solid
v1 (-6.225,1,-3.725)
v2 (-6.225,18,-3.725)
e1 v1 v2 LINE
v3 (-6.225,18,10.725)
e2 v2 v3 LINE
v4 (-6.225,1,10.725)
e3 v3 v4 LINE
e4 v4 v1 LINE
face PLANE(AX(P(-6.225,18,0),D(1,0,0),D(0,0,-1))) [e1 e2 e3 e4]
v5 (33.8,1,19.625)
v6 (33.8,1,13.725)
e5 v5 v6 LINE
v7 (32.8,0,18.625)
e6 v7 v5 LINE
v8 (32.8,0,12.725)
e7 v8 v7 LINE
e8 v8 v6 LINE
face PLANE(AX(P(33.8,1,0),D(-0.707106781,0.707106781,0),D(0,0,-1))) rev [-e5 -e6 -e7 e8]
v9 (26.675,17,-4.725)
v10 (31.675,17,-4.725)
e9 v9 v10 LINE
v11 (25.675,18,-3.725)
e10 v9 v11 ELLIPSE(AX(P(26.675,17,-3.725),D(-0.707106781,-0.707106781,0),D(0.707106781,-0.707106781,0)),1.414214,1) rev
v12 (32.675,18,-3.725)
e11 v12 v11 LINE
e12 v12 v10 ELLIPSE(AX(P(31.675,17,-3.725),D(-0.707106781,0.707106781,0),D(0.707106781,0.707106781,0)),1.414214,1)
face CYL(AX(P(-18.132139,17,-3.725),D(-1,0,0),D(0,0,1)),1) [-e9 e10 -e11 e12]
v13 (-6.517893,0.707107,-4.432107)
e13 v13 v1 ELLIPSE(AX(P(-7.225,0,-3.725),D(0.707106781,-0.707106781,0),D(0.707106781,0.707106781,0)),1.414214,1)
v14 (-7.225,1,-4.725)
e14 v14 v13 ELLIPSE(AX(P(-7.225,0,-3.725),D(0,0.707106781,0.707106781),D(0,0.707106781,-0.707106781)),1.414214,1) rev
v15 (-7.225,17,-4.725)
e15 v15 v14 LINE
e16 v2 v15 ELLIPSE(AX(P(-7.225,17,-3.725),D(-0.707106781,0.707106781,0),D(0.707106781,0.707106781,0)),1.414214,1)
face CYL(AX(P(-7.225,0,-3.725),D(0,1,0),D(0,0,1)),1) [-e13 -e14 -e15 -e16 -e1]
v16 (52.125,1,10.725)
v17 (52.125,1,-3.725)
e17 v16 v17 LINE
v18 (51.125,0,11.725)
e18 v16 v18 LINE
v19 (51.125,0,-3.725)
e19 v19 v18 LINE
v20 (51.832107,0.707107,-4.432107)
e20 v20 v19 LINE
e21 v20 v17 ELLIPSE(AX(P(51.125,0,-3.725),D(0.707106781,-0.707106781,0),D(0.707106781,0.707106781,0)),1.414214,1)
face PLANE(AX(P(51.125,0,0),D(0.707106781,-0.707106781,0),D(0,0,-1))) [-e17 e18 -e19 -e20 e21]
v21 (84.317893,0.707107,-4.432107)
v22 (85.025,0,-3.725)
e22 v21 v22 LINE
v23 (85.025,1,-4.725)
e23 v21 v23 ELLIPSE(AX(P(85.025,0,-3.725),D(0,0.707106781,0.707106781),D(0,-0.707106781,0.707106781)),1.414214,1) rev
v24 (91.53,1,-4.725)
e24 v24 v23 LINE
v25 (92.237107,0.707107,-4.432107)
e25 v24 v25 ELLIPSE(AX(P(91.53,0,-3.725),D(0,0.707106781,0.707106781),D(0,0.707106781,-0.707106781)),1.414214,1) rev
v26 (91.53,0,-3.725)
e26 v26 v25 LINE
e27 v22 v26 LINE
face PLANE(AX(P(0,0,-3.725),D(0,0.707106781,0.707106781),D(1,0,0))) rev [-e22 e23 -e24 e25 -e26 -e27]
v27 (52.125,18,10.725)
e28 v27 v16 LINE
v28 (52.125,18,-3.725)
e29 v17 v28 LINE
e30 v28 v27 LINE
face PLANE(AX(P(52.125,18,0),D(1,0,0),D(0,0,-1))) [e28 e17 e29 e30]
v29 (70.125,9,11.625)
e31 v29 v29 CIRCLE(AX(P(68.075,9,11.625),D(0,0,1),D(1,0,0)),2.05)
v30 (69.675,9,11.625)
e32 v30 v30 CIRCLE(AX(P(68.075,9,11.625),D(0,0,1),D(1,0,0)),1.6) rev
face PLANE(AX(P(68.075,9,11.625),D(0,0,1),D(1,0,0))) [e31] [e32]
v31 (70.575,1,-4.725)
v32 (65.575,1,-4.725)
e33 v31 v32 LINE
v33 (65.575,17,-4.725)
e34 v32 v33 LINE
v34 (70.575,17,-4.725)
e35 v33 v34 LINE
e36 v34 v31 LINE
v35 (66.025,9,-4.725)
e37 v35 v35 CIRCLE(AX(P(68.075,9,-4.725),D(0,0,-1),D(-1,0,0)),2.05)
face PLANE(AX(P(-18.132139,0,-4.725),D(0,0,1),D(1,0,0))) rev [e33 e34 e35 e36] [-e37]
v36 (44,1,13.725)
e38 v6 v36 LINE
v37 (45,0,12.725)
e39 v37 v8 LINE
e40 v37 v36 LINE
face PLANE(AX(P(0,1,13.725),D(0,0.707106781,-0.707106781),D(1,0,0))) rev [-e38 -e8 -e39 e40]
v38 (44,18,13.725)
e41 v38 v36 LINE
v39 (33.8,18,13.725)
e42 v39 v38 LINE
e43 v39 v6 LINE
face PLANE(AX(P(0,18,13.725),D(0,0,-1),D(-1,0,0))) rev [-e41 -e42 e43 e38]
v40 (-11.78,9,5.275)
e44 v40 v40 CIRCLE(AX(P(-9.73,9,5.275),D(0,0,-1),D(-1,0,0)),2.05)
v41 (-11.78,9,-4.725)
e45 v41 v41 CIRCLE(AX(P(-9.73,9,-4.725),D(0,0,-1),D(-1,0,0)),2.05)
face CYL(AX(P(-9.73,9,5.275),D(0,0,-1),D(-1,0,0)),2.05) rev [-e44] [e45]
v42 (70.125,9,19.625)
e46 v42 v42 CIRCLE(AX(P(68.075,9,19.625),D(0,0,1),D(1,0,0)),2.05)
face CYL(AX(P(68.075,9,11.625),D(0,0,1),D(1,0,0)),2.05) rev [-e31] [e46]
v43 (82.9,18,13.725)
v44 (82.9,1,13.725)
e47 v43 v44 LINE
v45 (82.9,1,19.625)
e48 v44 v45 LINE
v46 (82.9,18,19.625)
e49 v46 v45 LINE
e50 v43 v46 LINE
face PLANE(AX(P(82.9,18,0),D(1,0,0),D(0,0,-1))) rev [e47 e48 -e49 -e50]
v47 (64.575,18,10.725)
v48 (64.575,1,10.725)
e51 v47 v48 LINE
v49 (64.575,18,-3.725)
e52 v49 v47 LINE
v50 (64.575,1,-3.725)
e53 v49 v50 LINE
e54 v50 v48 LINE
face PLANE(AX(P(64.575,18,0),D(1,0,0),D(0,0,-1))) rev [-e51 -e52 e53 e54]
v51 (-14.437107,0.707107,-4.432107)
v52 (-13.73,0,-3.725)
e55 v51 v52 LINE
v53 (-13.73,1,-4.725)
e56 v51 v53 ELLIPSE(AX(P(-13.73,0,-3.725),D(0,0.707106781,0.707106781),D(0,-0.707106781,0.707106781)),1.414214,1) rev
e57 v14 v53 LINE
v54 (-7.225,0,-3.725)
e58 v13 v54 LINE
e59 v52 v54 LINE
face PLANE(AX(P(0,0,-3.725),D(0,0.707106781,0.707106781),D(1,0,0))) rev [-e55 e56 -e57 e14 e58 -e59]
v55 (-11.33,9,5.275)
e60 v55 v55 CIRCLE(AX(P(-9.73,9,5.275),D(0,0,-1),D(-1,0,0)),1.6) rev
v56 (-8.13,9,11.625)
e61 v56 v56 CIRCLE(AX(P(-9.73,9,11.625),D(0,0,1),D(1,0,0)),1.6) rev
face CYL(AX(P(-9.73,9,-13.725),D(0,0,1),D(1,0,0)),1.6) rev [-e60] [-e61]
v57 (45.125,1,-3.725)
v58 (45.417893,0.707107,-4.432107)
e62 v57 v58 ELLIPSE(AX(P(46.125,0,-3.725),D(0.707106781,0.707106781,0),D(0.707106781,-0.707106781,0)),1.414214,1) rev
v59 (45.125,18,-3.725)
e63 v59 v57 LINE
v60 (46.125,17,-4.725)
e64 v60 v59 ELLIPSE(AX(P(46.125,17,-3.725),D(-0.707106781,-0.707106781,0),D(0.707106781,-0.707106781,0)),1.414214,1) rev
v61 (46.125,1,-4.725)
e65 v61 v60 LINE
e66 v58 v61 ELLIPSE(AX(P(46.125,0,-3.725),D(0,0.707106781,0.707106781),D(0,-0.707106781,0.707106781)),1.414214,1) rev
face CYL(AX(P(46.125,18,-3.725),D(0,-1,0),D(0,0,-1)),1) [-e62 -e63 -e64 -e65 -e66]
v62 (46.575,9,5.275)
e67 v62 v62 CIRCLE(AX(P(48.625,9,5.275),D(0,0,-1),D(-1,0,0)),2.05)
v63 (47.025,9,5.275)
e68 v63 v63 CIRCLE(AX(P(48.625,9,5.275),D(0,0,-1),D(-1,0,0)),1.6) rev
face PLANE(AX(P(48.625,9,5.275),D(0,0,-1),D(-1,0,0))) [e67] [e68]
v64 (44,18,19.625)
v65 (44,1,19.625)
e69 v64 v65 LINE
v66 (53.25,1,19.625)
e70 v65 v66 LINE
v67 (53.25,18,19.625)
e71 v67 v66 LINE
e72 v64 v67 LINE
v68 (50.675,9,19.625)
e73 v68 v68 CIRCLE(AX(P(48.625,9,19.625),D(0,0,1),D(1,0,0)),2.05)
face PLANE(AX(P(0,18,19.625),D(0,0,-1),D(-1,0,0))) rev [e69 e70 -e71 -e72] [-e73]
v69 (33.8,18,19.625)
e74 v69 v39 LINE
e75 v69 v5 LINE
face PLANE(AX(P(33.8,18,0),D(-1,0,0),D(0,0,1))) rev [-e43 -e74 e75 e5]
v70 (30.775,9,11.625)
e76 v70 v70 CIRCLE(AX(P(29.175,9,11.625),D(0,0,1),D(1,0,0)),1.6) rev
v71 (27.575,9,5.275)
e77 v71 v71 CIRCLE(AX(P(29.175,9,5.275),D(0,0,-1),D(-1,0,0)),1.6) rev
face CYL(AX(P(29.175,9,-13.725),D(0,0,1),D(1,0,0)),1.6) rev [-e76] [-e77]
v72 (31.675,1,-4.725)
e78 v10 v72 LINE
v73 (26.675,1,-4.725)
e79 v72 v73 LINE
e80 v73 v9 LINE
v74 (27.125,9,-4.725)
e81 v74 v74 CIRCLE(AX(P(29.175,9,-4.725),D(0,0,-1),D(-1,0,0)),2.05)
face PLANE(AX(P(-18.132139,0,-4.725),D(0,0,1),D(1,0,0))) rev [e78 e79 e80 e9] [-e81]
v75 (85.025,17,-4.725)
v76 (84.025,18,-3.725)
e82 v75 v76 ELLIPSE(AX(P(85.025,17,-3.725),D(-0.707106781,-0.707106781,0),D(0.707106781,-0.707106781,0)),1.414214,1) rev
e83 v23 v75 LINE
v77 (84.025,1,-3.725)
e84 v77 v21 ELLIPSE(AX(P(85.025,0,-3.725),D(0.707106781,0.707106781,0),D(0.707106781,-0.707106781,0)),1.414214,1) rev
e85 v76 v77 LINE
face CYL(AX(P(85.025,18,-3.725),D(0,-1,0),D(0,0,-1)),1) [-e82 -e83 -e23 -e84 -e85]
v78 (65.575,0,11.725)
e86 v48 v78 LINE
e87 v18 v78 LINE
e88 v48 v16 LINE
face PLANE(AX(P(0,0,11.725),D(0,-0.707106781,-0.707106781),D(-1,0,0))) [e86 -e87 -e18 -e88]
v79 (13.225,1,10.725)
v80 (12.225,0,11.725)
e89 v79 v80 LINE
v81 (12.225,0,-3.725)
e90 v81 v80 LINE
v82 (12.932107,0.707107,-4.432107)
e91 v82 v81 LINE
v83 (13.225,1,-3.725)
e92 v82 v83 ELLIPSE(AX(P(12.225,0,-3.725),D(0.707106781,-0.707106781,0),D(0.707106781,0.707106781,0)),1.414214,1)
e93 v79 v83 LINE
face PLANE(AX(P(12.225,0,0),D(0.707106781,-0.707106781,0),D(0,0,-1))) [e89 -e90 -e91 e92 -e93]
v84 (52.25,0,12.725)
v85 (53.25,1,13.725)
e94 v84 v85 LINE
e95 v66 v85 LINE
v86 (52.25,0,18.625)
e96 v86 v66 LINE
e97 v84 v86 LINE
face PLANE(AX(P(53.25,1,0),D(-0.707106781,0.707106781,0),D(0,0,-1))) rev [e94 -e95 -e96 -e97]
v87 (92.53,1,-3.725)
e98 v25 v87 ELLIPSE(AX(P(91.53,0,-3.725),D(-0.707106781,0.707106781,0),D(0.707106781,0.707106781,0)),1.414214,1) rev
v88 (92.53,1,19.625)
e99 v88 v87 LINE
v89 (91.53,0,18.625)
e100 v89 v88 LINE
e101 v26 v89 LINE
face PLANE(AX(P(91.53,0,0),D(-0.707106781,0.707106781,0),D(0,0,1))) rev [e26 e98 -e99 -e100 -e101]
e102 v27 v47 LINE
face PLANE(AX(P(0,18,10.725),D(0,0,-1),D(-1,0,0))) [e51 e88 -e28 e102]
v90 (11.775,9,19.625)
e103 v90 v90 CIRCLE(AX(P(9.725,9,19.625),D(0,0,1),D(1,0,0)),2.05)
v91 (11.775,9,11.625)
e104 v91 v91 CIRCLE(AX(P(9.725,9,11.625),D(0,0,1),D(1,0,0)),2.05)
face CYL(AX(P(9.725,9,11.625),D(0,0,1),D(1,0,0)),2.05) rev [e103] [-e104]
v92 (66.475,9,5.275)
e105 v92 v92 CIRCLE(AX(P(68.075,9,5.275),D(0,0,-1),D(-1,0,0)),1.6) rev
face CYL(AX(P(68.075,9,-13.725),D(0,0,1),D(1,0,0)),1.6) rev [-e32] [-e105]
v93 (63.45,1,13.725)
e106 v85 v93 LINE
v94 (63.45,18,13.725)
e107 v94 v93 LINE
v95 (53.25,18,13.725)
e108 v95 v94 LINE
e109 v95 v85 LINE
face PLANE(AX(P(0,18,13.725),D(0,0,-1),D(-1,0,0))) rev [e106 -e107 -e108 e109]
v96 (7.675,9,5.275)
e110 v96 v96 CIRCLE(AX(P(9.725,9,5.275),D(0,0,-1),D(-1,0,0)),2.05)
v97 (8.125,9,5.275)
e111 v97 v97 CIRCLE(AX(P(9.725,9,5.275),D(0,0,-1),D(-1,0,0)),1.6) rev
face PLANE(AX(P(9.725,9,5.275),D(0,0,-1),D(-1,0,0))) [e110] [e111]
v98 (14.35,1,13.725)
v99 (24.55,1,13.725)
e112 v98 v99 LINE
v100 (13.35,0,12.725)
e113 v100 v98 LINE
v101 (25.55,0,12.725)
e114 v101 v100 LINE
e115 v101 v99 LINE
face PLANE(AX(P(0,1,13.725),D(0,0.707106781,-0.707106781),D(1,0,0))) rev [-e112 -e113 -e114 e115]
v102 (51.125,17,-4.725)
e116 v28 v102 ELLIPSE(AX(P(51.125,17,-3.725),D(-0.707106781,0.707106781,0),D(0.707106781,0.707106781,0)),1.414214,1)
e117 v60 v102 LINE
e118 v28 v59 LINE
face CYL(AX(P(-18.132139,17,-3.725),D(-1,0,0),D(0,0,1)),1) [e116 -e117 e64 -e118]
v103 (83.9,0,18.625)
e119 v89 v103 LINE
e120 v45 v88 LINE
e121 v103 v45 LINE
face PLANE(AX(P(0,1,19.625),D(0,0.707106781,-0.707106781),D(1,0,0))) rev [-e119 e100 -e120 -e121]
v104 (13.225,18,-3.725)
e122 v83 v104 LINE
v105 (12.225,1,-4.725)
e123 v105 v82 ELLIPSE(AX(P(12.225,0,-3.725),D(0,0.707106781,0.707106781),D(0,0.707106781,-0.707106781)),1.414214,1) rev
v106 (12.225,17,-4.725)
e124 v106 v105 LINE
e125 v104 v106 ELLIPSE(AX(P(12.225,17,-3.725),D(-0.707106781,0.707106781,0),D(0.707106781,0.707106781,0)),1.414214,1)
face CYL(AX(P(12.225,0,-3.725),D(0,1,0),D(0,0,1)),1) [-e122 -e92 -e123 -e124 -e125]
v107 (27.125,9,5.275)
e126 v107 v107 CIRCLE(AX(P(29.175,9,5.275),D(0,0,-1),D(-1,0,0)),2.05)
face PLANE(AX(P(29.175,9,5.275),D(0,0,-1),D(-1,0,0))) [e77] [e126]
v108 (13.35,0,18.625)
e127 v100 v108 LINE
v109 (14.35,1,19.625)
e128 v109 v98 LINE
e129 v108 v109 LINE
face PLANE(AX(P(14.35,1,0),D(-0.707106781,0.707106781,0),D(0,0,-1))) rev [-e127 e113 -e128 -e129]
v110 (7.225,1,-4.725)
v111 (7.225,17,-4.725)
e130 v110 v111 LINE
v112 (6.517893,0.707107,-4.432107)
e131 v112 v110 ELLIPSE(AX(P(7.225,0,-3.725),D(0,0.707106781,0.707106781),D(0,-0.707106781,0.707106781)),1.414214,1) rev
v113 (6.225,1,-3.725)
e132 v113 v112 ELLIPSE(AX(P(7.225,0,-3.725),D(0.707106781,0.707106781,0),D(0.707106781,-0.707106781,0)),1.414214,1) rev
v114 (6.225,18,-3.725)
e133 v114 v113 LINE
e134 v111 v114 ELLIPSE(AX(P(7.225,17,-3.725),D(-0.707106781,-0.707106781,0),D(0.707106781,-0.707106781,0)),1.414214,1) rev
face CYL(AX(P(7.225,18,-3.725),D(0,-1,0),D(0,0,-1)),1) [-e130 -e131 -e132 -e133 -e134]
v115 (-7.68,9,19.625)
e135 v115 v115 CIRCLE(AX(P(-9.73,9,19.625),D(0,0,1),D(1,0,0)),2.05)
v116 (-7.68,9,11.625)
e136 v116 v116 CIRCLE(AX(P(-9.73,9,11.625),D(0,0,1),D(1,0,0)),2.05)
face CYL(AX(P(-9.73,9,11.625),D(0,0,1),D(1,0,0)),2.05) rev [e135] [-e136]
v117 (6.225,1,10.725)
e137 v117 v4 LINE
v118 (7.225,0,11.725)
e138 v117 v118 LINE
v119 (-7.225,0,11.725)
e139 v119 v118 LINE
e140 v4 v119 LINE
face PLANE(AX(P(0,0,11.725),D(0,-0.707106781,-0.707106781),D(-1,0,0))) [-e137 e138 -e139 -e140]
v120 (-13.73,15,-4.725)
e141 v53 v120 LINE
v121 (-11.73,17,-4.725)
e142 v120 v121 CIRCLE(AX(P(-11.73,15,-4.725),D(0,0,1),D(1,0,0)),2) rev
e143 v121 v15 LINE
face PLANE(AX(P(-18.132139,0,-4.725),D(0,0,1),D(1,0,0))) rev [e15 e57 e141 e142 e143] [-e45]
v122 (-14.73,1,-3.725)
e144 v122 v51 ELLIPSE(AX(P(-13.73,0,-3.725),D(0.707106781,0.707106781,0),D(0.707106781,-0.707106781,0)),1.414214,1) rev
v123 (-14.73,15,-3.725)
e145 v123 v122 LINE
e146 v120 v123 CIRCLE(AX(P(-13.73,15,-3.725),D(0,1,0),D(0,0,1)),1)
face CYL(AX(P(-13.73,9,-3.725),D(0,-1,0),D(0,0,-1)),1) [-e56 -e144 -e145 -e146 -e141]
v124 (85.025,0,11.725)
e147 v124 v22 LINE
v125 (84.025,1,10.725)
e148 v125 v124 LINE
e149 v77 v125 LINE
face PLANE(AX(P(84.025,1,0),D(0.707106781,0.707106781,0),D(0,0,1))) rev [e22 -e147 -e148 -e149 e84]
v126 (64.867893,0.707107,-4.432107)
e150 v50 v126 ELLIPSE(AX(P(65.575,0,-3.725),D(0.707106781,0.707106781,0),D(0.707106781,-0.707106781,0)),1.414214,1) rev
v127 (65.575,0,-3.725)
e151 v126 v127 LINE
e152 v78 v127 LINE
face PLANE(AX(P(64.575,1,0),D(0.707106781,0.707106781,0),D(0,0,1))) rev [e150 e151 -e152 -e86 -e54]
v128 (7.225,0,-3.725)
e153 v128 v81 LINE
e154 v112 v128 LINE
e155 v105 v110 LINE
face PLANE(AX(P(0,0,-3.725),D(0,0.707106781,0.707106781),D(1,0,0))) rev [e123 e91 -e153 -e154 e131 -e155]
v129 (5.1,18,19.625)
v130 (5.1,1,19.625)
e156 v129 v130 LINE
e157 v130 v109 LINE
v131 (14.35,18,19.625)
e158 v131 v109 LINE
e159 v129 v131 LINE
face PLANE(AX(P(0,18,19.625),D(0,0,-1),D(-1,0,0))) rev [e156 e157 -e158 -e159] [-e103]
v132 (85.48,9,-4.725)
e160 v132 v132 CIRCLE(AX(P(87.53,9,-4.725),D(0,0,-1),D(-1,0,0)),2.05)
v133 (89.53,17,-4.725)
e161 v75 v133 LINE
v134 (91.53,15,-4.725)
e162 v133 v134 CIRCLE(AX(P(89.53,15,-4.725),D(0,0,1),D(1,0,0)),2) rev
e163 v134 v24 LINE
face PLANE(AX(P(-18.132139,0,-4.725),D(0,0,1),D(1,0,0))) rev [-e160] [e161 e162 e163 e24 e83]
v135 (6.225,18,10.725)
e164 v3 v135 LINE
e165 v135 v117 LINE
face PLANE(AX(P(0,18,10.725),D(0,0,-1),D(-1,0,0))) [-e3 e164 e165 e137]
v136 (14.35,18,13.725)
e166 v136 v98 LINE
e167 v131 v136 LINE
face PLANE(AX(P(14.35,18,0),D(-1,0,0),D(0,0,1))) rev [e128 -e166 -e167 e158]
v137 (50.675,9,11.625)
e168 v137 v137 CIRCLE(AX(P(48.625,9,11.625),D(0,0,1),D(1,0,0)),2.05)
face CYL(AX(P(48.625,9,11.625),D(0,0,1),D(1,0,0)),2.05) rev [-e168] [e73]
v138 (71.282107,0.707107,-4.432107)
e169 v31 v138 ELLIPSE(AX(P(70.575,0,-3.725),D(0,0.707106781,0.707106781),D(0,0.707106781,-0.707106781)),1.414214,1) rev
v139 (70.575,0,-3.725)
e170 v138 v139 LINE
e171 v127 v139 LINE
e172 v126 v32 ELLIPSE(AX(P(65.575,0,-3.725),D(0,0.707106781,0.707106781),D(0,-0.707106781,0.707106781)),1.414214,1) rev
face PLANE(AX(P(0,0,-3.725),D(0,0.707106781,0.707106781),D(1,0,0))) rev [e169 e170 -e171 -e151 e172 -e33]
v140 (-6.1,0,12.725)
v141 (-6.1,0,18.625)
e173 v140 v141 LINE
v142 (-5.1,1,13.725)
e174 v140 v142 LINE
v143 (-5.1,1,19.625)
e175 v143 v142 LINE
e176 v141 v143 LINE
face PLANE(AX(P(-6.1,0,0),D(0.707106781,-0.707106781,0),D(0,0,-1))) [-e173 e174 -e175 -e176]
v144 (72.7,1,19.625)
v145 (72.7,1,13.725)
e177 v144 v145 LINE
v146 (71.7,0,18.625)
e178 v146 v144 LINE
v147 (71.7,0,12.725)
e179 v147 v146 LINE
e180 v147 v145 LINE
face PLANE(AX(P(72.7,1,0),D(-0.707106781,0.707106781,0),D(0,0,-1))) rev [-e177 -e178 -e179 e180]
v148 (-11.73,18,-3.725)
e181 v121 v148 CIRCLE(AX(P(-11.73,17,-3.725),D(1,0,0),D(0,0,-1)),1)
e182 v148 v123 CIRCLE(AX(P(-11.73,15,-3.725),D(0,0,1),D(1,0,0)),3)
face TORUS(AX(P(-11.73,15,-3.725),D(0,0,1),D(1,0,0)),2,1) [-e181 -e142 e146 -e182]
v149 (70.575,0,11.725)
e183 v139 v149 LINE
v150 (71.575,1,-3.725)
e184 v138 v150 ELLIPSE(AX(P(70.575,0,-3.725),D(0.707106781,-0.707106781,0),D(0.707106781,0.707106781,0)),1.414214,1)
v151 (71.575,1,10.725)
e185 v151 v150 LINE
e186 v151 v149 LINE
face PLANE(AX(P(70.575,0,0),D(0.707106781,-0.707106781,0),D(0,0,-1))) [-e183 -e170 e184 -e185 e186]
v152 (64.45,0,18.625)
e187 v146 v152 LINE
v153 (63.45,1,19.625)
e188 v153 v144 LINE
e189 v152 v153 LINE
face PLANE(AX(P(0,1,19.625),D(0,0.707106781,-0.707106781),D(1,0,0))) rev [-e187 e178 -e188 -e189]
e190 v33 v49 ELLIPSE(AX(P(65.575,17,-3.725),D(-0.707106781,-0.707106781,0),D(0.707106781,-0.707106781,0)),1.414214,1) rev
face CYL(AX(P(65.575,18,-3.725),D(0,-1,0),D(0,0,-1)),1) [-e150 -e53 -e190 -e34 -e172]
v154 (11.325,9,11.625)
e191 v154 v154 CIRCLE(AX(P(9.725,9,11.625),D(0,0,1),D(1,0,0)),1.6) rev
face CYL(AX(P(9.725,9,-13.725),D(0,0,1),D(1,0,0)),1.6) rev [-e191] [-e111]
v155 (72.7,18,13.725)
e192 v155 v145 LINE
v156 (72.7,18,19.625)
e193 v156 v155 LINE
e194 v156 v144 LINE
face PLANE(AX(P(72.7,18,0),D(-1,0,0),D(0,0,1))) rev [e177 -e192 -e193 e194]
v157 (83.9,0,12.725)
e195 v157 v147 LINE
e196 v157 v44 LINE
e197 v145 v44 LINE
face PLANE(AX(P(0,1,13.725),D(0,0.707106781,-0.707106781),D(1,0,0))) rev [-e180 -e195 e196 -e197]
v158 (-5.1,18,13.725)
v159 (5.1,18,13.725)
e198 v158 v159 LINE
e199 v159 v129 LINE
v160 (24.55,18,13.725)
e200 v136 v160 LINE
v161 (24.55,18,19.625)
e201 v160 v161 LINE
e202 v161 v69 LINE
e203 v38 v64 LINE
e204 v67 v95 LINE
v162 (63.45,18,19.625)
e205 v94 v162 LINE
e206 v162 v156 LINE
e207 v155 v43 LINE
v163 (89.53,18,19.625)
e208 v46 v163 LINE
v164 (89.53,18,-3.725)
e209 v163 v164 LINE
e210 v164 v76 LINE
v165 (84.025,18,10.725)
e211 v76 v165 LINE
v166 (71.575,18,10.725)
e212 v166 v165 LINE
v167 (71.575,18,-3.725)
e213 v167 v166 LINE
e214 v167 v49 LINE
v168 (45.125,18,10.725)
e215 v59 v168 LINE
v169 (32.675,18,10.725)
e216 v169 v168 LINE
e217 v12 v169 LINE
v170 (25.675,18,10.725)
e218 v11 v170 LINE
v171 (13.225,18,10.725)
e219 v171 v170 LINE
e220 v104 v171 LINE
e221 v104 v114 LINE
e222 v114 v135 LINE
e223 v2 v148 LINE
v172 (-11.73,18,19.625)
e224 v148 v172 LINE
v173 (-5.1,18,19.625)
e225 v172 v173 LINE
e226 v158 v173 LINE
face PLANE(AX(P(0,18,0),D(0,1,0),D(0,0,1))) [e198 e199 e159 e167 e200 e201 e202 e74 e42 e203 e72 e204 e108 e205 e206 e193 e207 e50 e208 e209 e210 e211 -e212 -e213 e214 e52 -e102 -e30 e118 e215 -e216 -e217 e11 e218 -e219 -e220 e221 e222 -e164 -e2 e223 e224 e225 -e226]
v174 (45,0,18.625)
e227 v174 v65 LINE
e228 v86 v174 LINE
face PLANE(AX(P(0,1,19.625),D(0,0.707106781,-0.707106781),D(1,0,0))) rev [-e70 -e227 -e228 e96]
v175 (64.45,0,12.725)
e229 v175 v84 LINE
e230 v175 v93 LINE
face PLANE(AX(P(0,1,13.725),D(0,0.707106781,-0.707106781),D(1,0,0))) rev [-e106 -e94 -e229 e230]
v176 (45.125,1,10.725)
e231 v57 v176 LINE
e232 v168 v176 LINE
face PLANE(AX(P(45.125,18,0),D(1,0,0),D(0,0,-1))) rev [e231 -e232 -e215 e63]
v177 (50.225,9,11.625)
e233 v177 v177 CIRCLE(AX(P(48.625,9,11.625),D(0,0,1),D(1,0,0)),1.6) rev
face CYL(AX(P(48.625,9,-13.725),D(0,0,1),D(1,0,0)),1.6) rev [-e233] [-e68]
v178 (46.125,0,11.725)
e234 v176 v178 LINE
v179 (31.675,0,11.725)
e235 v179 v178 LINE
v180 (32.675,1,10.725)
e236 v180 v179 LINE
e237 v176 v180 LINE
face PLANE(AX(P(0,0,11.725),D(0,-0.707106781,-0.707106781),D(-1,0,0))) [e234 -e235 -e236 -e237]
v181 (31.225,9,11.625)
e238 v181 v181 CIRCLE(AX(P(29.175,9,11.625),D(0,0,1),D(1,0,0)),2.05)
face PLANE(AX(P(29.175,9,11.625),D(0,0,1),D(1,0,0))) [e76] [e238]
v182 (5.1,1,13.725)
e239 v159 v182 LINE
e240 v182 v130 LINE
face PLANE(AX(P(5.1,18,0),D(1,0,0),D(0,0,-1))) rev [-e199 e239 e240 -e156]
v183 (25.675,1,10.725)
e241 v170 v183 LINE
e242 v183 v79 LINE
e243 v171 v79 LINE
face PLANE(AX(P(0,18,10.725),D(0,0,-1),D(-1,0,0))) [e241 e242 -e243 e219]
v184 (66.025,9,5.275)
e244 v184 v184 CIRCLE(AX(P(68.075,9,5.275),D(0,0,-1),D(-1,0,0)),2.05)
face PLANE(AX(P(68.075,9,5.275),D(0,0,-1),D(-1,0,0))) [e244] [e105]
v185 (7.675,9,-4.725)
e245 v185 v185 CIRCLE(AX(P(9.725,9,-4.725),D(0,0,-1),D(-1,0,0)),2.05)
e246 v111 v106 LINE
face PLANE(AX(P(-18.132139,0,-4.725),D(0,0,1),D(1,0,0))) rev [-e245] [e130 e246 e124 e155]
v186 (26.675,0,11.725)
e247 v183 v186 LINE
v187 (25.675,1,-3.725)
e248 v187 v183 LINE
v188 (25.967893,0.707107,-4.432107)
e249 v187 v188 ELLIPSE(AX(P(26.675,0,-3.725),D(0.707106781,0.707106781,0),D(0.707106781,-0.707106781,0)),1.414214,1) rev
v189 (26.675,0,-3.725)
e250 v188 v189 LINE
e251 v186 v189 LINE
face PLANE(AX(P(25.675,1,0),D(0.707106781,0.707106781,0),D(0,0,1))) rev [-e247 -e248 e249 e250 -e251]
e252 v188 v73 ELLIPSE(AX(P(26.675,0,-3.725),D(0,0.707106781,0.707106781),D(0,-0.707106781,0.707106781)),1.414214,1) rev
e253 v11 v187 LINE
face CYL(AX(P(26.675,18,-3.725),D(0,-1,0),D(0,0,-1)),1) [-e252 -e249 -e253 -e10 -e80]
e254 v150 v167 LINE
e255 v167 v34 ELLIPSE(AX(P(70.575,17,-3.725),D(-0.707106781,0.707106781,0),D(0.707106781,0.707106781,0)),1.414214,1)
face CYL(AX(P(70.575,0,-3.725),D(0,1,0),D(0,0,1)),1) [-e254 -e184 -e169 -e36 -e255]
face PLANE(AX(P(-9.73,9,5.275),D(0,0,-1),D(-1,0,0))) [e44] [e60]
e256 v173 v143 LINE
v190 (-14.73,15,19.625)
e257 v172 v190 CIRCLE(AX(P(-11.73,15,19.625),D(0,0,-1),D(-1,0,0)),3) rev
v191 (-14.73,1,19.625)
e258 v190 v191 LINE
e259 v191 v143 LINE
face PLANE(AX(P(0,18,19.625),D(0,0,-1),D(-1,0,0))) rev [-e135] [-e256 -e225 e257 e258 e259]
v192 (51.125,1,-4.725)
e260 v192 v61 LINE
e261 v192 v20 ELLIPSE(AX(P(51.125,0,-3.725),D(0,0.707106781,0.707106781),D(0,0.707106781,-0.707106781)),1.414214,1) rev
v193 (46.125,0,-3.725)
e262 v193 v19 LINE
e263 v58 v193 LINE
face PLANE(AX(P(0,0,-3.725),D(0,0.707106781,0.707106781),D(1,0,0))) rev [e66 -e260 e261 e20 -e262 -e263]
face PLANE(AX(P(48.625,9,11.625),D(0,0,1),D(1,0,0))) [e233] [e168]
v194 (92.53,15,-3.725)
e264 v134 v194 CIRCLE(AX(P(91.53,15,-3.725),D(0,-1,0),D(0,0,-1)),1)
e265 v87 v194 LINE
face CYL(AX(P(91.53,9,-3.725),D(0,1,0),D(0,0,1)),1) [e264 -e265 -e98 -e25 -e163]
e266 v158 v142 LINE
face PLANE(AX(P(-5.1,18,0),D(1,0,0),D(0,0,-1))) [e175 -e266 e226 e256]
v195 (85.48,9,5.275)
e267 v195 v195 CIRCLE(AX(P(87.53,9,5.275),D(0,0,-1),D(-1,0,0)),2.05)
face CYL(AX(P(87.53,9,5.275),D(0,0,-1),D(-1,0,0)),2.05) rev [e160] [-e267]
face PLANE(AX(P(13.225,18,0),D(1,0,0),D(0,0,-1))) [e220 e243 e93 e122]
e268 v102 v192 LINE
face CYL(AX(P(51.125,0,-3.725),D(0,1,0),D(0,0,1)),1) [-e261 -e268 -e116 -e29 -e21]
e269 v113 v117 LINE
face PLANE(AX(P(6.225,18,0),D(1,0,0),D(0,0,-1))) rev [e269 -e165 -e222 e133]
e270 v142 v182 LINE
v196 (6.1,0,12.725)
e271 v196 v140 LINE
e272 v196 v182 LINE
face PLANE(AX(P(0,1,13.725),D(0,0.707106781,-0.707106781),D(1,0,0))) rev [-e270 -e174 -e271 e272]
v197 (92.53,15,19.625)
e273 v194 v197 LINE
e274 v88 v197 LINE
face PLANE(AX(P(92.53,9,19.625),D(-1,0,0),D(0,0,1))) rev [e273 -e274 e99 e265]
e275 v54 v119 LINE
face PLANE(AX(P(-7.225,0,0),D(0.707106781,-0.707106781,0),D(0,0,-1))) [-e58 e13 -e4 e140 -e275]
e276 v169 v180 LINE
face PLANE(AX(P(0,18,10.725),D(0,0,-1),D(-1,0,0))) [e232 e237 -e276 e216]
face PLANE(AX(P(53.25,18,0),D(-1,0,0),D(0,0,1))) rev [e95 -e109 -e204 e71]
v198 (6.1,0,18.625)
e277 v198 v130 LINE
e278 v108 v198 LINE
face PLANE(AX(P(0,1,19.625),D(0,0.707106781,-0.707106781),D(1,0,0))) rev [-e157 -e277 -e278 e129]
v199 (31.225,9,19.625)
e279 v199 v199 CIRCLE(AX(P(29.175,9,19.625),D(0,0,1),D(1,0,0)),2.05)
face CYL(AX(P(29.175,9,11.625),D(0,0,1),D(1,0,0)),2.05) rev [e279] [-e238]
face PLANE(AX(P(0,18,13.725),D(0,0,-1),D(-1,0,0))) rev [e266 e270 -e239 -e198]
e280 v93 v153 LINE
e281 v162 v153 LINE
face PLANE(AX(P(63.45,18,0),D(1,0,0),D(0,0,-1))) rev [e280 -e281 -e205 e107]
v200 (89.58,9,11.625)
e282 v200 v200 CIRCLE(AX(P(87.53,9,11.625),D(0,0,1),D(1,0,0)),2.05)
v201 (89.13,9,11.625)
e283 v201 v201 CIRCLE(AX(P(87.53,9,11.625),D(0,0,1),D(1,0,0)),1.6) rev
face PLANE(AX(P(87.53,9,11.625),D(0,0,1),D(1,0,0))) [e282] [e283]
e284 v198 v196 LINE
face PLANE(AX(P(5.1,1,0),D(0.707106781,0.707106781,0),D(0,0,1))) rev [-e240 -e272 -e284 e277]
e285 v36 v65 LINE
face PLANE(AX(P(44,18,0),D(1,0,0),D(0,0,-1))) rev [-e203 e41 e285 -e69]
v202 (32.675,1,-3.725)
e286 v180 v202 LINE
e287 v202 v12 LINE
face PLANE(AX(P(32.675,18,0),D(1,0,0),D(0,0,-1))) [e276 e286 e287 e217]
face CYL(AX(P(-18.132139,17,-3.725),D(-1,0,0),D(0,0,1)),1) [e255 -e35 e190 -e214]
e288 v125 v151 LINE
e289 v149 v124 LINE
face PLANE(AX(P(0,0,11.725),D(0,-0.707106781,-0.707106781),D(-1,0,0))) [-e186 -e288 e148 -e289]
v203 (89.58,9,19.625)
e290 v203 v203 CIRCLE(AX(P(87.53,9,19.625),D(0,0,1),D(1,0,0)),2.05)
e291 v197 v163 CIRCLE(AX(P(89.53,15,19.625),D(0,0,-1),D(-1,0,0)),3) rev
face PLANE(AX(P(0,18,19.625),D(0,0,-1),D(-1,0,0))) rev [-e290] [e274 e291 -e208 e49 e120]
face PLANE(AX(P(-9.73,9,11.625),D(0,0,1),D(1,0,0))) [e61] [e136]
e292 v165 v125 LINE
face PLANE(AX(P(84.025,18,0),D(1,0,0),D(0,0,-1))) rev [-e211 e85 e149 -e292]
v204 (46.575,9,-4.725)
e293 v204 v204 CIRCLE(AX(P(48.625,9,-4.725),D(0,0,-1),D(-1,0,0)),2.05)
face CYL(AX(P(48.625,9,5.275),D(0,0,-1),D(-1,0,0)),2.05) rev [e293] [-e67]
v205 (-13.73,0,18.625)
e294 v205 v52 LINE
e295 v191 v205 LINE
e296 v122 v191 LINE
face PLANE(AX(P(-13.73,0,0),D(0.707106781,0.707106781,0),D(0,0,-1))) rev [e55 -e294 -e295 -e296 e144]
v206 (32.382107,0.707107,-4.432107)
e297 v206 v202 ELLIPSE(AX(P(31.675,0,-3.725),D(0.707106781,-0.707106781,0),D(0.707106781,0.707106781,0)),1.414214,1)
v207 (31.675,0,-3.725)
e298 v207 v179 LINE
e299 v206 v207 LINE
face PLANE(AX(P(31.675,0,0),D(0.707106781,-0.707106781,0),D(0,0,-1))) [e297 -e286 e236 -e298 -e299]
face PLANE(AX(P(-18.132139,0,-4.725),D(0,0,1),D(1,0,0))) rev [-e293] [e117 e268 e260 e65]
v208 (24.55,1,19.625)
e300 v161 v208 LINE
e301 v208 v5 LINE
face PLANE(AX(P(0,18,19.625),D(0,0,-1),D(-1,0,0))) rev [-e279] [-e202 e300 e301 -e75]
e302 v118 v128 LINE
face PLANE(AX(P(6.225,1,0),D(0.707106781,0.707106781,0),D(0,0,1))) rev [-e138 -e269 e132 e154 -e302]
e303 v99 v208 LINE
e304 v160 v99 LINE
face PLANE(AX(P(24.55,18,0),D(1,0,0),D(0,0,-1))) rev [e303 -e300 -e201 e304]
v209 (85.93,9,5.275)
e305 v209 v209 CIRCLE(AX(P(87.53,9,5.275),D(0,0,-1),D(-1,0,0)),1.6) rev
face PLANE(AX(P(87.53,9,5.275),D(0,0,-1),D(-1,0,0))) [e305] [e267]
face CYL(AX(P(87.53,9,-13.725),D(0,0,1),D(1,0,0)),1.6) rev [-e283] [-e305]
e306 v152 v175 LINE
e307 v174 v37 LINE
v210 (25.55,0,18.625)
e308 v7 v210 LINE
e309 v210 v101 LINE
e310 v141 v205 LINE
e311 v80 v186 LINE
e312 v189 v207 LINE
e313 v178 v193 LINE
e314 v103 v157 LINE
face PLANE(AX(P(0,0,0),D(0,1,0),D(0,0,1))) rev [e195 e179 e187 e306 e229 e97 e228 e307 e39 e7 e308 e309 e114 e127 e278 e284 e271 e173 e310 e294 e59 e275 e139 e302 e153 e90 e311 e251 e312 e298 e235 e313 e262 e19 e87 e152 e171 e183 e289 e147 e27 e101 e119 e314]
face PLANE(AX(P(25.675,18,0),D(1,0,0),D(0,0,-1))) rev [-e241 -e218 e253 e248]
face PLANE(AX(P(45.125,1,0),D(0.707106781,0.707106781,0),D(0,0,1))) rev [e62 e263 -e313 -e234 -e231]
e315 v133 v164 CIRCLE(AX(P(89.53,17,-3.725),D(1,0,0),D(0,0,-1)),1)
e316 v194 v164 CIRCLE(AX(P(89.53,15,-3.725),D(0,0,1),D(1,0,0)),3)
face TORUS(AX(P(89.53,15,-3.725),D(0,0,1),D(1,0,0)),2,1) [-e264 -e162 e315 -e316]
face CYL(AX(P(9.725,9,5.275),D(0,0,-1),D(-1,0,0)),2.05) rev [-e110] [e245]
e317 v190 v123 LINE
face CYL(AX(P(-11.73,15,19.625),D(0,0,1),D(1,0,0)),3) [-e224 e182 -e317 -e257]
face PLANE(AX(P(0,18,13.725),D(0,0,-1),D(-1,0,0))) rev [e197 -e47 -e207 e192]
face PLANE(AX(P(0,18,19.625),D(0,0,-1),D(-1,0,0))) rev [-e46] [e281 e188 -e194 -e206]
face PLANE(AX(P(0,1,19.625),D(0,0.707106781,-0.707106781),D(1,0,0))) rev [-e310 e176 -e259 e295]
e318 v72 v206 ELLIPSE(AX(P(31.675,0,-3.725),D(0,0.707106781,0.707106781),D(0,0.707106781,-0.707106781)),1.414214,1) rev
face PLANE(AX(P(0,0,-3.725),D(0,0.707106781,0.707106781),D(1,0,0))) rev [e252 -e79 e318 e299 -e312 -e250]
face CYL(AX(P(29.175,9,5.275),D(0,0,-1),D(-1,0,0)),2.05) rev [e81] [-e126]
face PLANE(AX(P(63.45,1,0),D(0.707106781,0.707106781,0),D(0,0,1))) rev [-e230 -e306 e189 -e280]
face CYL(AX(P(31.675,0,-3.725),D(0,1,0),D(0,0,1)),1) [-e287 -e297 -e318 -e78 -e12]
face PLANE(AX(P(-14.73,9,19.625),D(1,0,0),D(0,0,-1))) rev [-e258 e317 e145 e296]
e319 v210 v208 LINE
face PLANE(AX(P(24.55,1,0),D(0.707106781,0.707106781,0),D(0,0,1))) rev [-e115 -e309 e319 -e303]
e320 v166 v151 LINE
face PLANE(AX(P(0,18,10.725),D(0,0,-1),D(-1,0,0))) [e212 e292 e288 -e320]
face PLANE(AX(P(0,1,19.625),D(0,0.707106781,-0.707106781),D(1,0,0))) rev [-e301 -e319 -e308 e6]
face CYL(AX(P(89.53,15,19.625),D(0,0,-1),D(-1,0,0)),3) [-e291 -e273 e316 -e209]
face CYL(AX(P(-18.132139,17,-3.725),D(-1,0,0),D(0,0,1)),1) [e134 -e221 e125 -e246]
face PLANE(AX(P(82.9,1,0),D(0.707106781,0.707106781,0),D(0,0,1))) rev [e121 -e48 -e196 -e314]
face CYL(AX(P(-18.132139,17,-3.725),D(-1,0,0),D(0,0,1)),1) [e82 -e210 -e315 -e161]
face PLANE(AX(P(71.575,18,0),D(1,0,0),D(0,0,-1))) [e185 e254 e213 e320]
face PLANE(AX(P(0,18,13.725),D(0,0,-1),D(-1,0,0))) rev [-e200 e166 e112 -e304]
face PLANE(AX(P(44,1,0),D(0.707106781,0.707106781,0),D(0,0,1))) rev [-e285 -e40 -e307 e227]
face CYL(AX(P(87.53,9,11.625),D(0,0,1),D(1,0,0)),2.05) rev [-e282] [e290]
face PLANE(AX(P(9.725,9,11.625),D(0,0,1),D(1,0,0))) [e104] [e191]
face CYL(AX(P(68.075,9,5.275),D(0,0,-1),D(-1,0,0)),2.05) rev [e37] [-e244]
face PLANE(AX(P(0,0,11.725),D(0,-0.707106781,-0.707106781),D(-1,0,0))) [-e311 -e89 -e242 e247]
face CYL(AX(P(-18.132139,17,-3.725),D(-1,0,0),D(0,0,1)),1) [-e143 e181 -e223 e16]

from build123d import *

# Parameters (mm, degrees)
SKETCH1_W           = 12.45
SKETCH1_H           = 21.45
BOSS_EXTRUDE1_DEPTH = 18
SKETCH2_W           = 10
SKETCH2_H           = 3
BOSS_EXTRUDE2_DEPTH = 18
SKETCH4_W           = 7
SKETCH4_H           = 8.185466936
SKETCH4_H_2         = 9.121133548
SKETCH4_H_3         = 13.415591142
SKETCH4_H_4         = 10.11507115
SKETCH4_H_5         = 8.575799248
CUT_EXTRUDE2_DEPTH  = 6
FILLET3_R           = 3.5
FILLET4_R           = 2
SKETCH5_R           = 1.6
CUT_EXTRUDE3_DEPTH  = 105.163684291
CUT_EXTRUDE4_DEPTH  = 105.163684291
SKETCH10_W          = 7.3675
SKETCH10_H          = 18
SKETCH10_R          = 1.6
BOSS_EXTRUDE4_DEPTH = 21.45
FILLET6_R           = 3
SKETCH11_W          = 114.139507882
SKETCH11_H          = 1
CUT_EXTRUDE5_DEPTH  = 97.285728563
CHAMFER1_SIZE       = 1
CHAMFER2_SIZE       = 1
FILLET7_R           = 1
FILLET8_R           = 1
FILLET9_R           = 1
SKETCH13_R          = 2.05
CUT_EXTRUDE6_DEPTH  = 8
SKETCH14_R          = 2.05
CUT_EXTRUDE7_DEPTH  = 10
SKETCH15_W          = 114.000331722
SKETCH15_H          = 33.1435942
CUT_EXTRUDE9_DEPTH  = 97.285728563


with BuildPart() as part:
    # Sketch1 → Boss-Extrude1 (new body)
    with BuildSketch(Plane(origin=(0, 0, 0), x_dir=(1, 0, 0), z_dir=(0, 1, 0))):
        Polygon((-19.225, -19.625), (-5.1, -19.625), (-5.1, -13.725), (5.1, -13.725), (5.1, -19.625), (14.35, -19.625), (14.35, -13.725), (24.55, -13.725), (24.55, -19.625), (33.8, -19.625), (33.8, -13.725), (44, -13.725), (44, -19.625), (53.25, -19.625), (53.25, -13.725), (63.45, -13.725), (63.45, -19.625), (72.7, -19.625), (72.7, -13.725), (82.9, -13.725), (82.9, -19.625), (97.025, -19.625), (97.025, -10.725), (87.025, -10.725), (87.025, 13.725), (-9.225, 13.725), (-9.225, -10.725), (-19.225, -10.725), align=None)
        Rectangle(SKETCH1_W, SKETCH1_H, mode=Mode.SUBTRACT)
        with Locations((19.45, 0)):
            Rectangle(SKETCH1_W, SKETCH1_H, mode=Mode.SUBTRACT)
        with Locations((38.9, 0)):
            Rectangle(SKETCH1_W, SKETCH1_H, mode=Mode.SUBTRACT)
        with Locations((58.35, 0)):
            Rectangle(SKETCH1_W, SKETCH1_H, mode=Mode.SUBTRACT)
        with Locations((77.8, 0)):
            Rectangle(SKETCH1_W, SKETCH1_H, mode=Mode.SUBTRACT)
    extrude(amount=BOSS_EXTRUDE1_DEPTH)

    # Sketch2 → Boss-Extrude2 (add)
    with BuildSketch(Plane(origin=(0, 18, 0), x_dir=(1, 0, 0), z_dir=(0, 1, 0))):
        with Locations((-14.225, -9.225)):
            Rectangle(SKETCH2_W, SKETCH2_H)
        with Locations((92.025, -9.225)):
            Rectangle(SKETCH2_W, SKETCH2_H)
    extrude(amount=-BOSS_EXTRUDE2_DEPTH)

    # Sketch4 → Cut-Extrude2 (cut)
    with BuildSketch(Plane(origin=(0, 18, 0), x_dir=(1, 0, 0), z_dir=(0, 1, 0))):
        with Locations((0, 10.725)):
            Rectangle(SKETCH4_W, SKETCH4_H)
        with Locations((19.45, 10.725)):
            Rectangle(SKETCH4_W, SKETCH4_H_2)
        with Locations((38.9, 10.725)):
            Rectangle(SKETCH4_W, SKETCH4_H_3)
        with Locations((58.35, 10.725)):
            Rectangle(SKETCH4_W, SKETCH4_H_4)
        with Locations((77.8, 10.725)):
            Rectangle(SKETCH4_W, SKETCH4_H_5)
    extrude(amount=-CUT_EXTRUDE2_DEPTH, mode=Mode.SUBTRACT)

    # Fillet3
    fillet3_edges = [part.edges().sort_by_distance(p)[0] for p in [
        (81.3, 12, -12.225),
        (74.3, 12, -12.225),
        (54.85, 12, -12.225),
        (61.85, 12, -12.225),
        (42.4, 12, -12.225),
        (35.4, 12, -12.225),
        (15.95, 12, -12.225),
        (22.95, 12, -12.225),
        (3.5, 12, -12.225),
        (-3.5, 12, -12.225),
    ]]
    fillet(fillet3_edges, radius=FILLET3_R - 0.0001)  # a hair under: the kernel refuses the full size

    # Fillet4
    fillet4_edges = [part.edges().sort_by_distance(p)[0] for p in [
        (74.3, 18, -12.225),
        (81.3, 18, -12.225),
        (54.85, 18, -12.225),
        (61.85, 18, -12.225),
        (35.4, 18, -12.225),
        (42.4, 18, -12.225),
        (15.95, 18, -12.225),
        (22.95, 18, -12.225),
        (-3.5, 18, -12.225),
        (3.5, 18, -12.225),
    ]]
    fillet(fillet4_edges, radius=FILLET4_R)

    # Sketch5 → Cut-Extrude3 (cut, through all)
    with BuildSketch(Plane.XY.offset(19.625)):
        with Locations((9.725, 9)):
            Circle(SKETCH5_R)
        with Locations((29.175, 9)):
            Circle(SKETCH5_R)
        with Locations((48.625, 9)):
            Circle(SKETCH5_R)
        with Locations((68.075, 9)):
            Circle(SKETCH5_R)
        with Locations((87.53, 9)):
            Circle(SKETCH5_R)
        with Locations((-9.73, 9)):
            Circle(SKETCH5_R)
    extrude(amount=-CUT_EXTRUDE3_DEPTH, mode=Mode.SUBTRACT)

    # Sketch7 → Cut-Extrude4 (cut, through all)
    with BuildSketch(Plane(origin=(0, 0, -13.725), x_dir=(-1, 0, 0), z_dir=(0, 0, -1))):
        Polygon((-92.53, 9), (-92.53, -2.934603673), (-102.870987394, -2.934603673), (-102.870987394, 21.319522162), (-92.53, 21.319522162), align=None)
        Polygon((14.73, 9), (14.73, -3.337317556), (26.94038456, -3.337317556), (26.94038456, 20.180651888), (14.73, 20.180651888), align=None)
    extrude(amount=-CUT_EXTRUDE4_DEPTH, mode=Mode.SUBTRACT)

    # Sketch10 → Boss-Extrude4 (add)
    # profile 1 of 2: a face of its own
    with BuildSketch(Plane(origin=(0, 0, 7.725), x_dir=(-1, 0, 0), z_dir=(0, 0, -1))):
        with Locations((-88.84625, 9)):
            Rectangle(SKETCH10_W, SKETCH10_H)
        with Locations(Location((-87.53, 9, 0), (0, 0, 180))):
            Circle(SKETCH10_R, mode=Mode.SUBTRACT)
    # profile 2 of 2: a face of its own
    with BuildSketch(Plane(origin=(0, 0, 7.725), x_dir=(-1, 0, 0), z_dir=(0, 0, -1))):
        with Locations((11.04625, 9)):
            Rectangle(SKETCH10_W, SKETCH10_H)
        with Locations(Location((9.73, 9, 0), (0, 0, 180))):
            Circle(SKETCH10_R, mode=Mode.SUBTRACT)
    extrude(amount=BOSS_EXTRUDE4_DEPTH)

    # Fillet6
    fillet6_edges = [part.edges().sort_by_distance(p)[0] for p in [
        (92.53, 18, 2.95),
        (-14.73, 18, 2.95),
    ]]
    fillet(fillet6_edges, radius=FILLET6_R)

    # Sketch11 → Cut-Extrude5 (cut, through all)
    with BuildSketch(Plane(origin=(0, 18, 0), x_dir=(1, 0, 0), z_dir=(0, 1, 0))):
        with Locations((38.937615411, 5.225)):
            Rectangle(SKETCH11_W, SKETCH11_H)
    extrude(amount=-CUT_EXTRUDE5_DEPTH, mode=Mode.SUBTRACT)


with BuildPart() as cut_extrude5_piece_1:
    # of the separate pieces the step leaves, piece 1, a body of its own (cut_extrude5_pieces)
    add(part.part.solids().sort_by_distance((-11.73, 18, -4.725))[0])

    # Chamfer2
    chamfer2_edges = [cut_extrude5_piece_1.edges().sort_by_distance(p)[0] for p in [
        (-9.915, 0, 19.625),
        (-14.73, 0, 7.45),
        (68.075, 0, 19.625),
        (63.45, 0, 16.675),
        (58.35, 0, 13.725),
        (53.25, 0, 16.675),
        (48.625, 0, 19.625),
        (44, 0, 16.675),
        (38.9, 0, 13.725),
        (33.8, 0, 16.675),
        (29.175, 0, 19.625),
        (24.55, 0, 16.675),
        (19.45, 0, 13.725),
        (14.35, 0, 16.675),
        (9.725, 0, 19.625),
        (5.1, 0, 16.675),
        (0, 0, 13.725),
        (-5.1, 0, 16.675),
        (92.53, 0, 7.45),
        (-6.225, 0, 3),
        (6.225, 0, 3),
        (25.675, 0, 3),
        (87.715, 0, 19.625),
        (13.225, 0, 3),
        (45.125, 0, 3),
        (32.675, 0, 3),
        (64.575, 0, 3),
        (52.125, 0, 3),
        (84.025, 0, 3),
        (71.575, 0, 3),
        (82.9, 0, 16.675),
        (77.8, 0, 13.725),
        (72.7, 0, 16.675),
        (77.8, 0, 10.725),
        (9.725, 0, -4.725),
        (88.2775, 0, -4.725),
        (68.075, 0, -4.725),
        (48.625, 0, -4.725),
        (29.175, 0, -4.725),
        (-10.4775, 0, -4.725),
        (58.35, 0, 10.725),
        (38.9, 0, 10.725),
        (19.45, 0, 10.725),
        (0, 0, 10.725),
    ]]
    chamfer(chamfer2_edges, length=CHAMFER2_SIZE)

    # Fillet7
    fillet7_edges = [cut_extrude5_piece_1.edges().sort_by_distance(p)[0] for p in [
        (91.651320344, 17.121320344, -4.725),
        (71.575, 9.5, -4.725),
        (52.125, 9.5, -4.725),
        (32.675, 9.5, -4.725),
        (13.225, 9.5, -4.725),
        (6.225, 9.5, -4.725),
        (84.025, 9.5, -4.725),
        (64.575, 9.5, -4.725),
        (45.125, 9.5, -4.725),
        (25.675, 9.5, -4.725),
        (-6.225, 9.5, -4.725),
        (-14.73, 8, -4.725),
        (-13.851320344, 17.121320344, -4.725),
        (9.725, 18, -4.725),
        (86.7775, 18, -4.725),
        (68.075, 18, -4.725),
        (48.625, 18, -4.725),
        (29.175, 18, -4.725),
        (-8.9775, 18, -4.725),
        (92.53, 8, -4.725),
    ]]
    fillet(fillet7_edges, radius=FILLET7_R)

    # Sketch13 → Cut-Extrude6 (cut)
    with BuildSketch(Plane.XY.offset(19.625)):
        with Locations((-9.73, 9)):
            Circle(SKETCH13_R)
        with Locations((9.725, 9)):
            Circle(SKETCH13_R)
        with Locations((29.175, 9)):
            Circle(SKETCH13_R)
        with Locations((48.625, 9)):
            Circle(SKETCH13_R)
        with Locations((68.075, 9)):
            Circle(SKETCH13_R)
        with Locations((87.53, 9)):
            Circle(SKETCH13_R)
    extrude(amount=-CUT_EXTRUDE6_DEPTH, mode=Mode.SUBTRACT)

    # Sketch14 → Cut-Extrude7 (cut)
    with BuildSketch(Plane(origin=(0, 0, -4.725), x_dir=(-1, 0, 0), z_dir=(0, 0, -1))):
        with Locations(Location((-87.53, 9, 0), (0, 0, 180))):
            Circle(SKETCH14_R)
        with Locations(Location((-68.075, 9, 0), (0, 0, 180))):
            Circle(SKETCH14_R)
        with Locations(Location((-48.625, 9, 0), (0, 0, 180))):
            Circle(SKETCH14_R)
        with Locations(Location((-29.175, 9, 0), (0, 0, 180))):
            Circle(SKETCH14_R)
        with Locations(Location((-9.725, 9, 0), (0, 0, 180))):
            Circle(SKETCH14_R)
        with Locations(Location((9.73, 9, 0), (0, 0, 180))):
            Circle(SKETCH14_R)
    extrude(amount=-CUT_EXTRUDE7_DEPTH, mode=Mode.SUBTRACT)


with BuildPart() as cut_extrude5_piece_2:
    # of the separate pieces the step leaves, piece 2, a body of its own (cut_extrude5_pieces)
    add(part.part.solids().sort_by_distance((-11.73, 18, -13.725))[0])

    # Chamfer1
    chamfer1_edges = [cut_extrude5_piece_2.edges().sort_by_distance(p)[0] for p in [
        (77.8, 0, -10.725),
        (58.35, 0, -10.725),
        (38.9, 0, -10.725),
        (6.225, 0, -8.225),
        (19.45, 0, -10.725),
        (0, 0, -10.725),
        (84.025, 0, -8.225),
        (64.575, 0, -8.225),
        (45.125, 0, -8.225),
        (25.675, 0, -8.225),
        (92.53, 0, -9.725),
        (88.2775, 0, -5.725),
        (71.575, 0, -8.225),
        (68.075, 0, -5.725),
        (52.125, 0, -8.225),
        (48.625, 0, -5.725),
        (32.675, 0, -8.225),
        (29.175, 0, -5.725),
        (13.225, 0, -8.225),
        (9.725, 0, -5.725),
        (-6.225, 0, -8.225),
        (-10.4775, 0, -5.725),
        (-14.73, 0, -9.725),
        (38.9, 0, -13.725),
    ]]
    chamfer(chamfer1_edges, length=CHAMFER1_SIZE)

    # Fillet8
    fillet8_edges = [cut_extrude5_piece_2.edges().sort_by_distance(p)[0] for p in [
        (-14.73, 8, -5.725),
        (-6.225, 9.5, -5.725),
        (6.225, 9.5, -5.725),
        (13.225, 9.5, -5.725),
        (25.675, 9.5, -5.725),
        (32.675, 9.5, -5.725),
        (45.125, 9.5, -5.725),
        (52.125, 9.5, -5.725),
        (64.575, 9.5, -5.725),
        (71.575, 9.5, -5.725),
        (84.025, 9.5, -5.725),
        (91.651320344, 17.121320344, -5.725),
        (86.7775, 18, -5.725),
        (-8.9775, 18, -5.725),
        (-13.851320344, 17.121320344, -5.725),
        (9.725, 18, -5.725),
        (29.175, 18, -5.725),
        (48.625, 18, -5.725),
        (68.075, 18, -5.725),
        (92.53, 8, -5.725),
    ]]
    fillet(fillet8_edges, radius=FILLET8_R)

    # Fillet9
    fillet9_edges = [cut_extrude5_piece_2.edges().sort_by_distance(p)[0] for p in [
        (-2.474903023, 13.025096977, -13.725),
        (2.474903023, 13.025096977, -13.725),
        (4.085786438, 17.414213562, -13.725),
        (9.725, 18, -13.725),
        (15.364213562, 17.414213562, -13.725),
        (16.975096977, 13.025096977, -13.725),
        (21.924903023, 13.025096977, -13.725),
        (23.535786438, 17.414213562, -13.725),
        (29.175, 18, -13.725),
        (34.814213562, 17.414213562, -13.725),
        (36.425096977, 13.025096977, -13.725),
        (41.374903023, 13.025096977, -13.725),
        (42.985786438, 17.414213562, -13.725),
        (48.625, 18, -13.725),
        (54.264213562, 17.414213562, -13.725),
        (55.875096977, 13.025096977, -13.725),
        (60.824903023, 13.025096977, -13.725),
        (62.435786438, 17.414213562, -13.725),
        (68.075, 18, -13.725),
        (73.714213562, 17.414213562, -13.725),
        (75.325096977, 13.025096977, -13.725),
        (80.274903023, 13.025096977, -13.725),
        (81.885786438, 17.414213562, -13.725),
        (86.415, 18, -13.725),
        (91.651320344, 17.121320344, -13.725),
        (92.53, 8, -13.725),
        (-14.73, 8, -13.725),
        (81.3, 15.74995, -13.725),
        (74.3, 15.74995, -13.725),
        (61.85, 15.74995, -13.725),
        (54.85, 15.74995, -13.725),
        (42.4, 15.74995, -13.725),
        (35.4, 15.74995, -13.725),
        (22.95, 15.74995, -13.725),
        (15.95, 15.74995, -13.725),
        (3.5, 15.74995, -13.725),
        (-3.5, 15.74995, -13.725),
        (-13.851320344, 17.121320344, -13.725),
        (-8.615, 18, -13.725),
        (-4.085786438, 17.414213562, -13.725),
    ]]
    fillet(fillet9_edges, radius=FILLET9_R)

    # Sketch15 → Cut-Extrude9 (cut, through all)
    with BuildSketch(Plane.XZ):
        with Locations((36.723202727, -21.801193098)):
            Rectangle(SKETCH15_W, SKETCH15_H)
    extrude(amount=-CUT_EXTRUDE9_DEPTH, mode=Mode.SUBTRACT)


solid = cut_extrude5_piece_1.part
